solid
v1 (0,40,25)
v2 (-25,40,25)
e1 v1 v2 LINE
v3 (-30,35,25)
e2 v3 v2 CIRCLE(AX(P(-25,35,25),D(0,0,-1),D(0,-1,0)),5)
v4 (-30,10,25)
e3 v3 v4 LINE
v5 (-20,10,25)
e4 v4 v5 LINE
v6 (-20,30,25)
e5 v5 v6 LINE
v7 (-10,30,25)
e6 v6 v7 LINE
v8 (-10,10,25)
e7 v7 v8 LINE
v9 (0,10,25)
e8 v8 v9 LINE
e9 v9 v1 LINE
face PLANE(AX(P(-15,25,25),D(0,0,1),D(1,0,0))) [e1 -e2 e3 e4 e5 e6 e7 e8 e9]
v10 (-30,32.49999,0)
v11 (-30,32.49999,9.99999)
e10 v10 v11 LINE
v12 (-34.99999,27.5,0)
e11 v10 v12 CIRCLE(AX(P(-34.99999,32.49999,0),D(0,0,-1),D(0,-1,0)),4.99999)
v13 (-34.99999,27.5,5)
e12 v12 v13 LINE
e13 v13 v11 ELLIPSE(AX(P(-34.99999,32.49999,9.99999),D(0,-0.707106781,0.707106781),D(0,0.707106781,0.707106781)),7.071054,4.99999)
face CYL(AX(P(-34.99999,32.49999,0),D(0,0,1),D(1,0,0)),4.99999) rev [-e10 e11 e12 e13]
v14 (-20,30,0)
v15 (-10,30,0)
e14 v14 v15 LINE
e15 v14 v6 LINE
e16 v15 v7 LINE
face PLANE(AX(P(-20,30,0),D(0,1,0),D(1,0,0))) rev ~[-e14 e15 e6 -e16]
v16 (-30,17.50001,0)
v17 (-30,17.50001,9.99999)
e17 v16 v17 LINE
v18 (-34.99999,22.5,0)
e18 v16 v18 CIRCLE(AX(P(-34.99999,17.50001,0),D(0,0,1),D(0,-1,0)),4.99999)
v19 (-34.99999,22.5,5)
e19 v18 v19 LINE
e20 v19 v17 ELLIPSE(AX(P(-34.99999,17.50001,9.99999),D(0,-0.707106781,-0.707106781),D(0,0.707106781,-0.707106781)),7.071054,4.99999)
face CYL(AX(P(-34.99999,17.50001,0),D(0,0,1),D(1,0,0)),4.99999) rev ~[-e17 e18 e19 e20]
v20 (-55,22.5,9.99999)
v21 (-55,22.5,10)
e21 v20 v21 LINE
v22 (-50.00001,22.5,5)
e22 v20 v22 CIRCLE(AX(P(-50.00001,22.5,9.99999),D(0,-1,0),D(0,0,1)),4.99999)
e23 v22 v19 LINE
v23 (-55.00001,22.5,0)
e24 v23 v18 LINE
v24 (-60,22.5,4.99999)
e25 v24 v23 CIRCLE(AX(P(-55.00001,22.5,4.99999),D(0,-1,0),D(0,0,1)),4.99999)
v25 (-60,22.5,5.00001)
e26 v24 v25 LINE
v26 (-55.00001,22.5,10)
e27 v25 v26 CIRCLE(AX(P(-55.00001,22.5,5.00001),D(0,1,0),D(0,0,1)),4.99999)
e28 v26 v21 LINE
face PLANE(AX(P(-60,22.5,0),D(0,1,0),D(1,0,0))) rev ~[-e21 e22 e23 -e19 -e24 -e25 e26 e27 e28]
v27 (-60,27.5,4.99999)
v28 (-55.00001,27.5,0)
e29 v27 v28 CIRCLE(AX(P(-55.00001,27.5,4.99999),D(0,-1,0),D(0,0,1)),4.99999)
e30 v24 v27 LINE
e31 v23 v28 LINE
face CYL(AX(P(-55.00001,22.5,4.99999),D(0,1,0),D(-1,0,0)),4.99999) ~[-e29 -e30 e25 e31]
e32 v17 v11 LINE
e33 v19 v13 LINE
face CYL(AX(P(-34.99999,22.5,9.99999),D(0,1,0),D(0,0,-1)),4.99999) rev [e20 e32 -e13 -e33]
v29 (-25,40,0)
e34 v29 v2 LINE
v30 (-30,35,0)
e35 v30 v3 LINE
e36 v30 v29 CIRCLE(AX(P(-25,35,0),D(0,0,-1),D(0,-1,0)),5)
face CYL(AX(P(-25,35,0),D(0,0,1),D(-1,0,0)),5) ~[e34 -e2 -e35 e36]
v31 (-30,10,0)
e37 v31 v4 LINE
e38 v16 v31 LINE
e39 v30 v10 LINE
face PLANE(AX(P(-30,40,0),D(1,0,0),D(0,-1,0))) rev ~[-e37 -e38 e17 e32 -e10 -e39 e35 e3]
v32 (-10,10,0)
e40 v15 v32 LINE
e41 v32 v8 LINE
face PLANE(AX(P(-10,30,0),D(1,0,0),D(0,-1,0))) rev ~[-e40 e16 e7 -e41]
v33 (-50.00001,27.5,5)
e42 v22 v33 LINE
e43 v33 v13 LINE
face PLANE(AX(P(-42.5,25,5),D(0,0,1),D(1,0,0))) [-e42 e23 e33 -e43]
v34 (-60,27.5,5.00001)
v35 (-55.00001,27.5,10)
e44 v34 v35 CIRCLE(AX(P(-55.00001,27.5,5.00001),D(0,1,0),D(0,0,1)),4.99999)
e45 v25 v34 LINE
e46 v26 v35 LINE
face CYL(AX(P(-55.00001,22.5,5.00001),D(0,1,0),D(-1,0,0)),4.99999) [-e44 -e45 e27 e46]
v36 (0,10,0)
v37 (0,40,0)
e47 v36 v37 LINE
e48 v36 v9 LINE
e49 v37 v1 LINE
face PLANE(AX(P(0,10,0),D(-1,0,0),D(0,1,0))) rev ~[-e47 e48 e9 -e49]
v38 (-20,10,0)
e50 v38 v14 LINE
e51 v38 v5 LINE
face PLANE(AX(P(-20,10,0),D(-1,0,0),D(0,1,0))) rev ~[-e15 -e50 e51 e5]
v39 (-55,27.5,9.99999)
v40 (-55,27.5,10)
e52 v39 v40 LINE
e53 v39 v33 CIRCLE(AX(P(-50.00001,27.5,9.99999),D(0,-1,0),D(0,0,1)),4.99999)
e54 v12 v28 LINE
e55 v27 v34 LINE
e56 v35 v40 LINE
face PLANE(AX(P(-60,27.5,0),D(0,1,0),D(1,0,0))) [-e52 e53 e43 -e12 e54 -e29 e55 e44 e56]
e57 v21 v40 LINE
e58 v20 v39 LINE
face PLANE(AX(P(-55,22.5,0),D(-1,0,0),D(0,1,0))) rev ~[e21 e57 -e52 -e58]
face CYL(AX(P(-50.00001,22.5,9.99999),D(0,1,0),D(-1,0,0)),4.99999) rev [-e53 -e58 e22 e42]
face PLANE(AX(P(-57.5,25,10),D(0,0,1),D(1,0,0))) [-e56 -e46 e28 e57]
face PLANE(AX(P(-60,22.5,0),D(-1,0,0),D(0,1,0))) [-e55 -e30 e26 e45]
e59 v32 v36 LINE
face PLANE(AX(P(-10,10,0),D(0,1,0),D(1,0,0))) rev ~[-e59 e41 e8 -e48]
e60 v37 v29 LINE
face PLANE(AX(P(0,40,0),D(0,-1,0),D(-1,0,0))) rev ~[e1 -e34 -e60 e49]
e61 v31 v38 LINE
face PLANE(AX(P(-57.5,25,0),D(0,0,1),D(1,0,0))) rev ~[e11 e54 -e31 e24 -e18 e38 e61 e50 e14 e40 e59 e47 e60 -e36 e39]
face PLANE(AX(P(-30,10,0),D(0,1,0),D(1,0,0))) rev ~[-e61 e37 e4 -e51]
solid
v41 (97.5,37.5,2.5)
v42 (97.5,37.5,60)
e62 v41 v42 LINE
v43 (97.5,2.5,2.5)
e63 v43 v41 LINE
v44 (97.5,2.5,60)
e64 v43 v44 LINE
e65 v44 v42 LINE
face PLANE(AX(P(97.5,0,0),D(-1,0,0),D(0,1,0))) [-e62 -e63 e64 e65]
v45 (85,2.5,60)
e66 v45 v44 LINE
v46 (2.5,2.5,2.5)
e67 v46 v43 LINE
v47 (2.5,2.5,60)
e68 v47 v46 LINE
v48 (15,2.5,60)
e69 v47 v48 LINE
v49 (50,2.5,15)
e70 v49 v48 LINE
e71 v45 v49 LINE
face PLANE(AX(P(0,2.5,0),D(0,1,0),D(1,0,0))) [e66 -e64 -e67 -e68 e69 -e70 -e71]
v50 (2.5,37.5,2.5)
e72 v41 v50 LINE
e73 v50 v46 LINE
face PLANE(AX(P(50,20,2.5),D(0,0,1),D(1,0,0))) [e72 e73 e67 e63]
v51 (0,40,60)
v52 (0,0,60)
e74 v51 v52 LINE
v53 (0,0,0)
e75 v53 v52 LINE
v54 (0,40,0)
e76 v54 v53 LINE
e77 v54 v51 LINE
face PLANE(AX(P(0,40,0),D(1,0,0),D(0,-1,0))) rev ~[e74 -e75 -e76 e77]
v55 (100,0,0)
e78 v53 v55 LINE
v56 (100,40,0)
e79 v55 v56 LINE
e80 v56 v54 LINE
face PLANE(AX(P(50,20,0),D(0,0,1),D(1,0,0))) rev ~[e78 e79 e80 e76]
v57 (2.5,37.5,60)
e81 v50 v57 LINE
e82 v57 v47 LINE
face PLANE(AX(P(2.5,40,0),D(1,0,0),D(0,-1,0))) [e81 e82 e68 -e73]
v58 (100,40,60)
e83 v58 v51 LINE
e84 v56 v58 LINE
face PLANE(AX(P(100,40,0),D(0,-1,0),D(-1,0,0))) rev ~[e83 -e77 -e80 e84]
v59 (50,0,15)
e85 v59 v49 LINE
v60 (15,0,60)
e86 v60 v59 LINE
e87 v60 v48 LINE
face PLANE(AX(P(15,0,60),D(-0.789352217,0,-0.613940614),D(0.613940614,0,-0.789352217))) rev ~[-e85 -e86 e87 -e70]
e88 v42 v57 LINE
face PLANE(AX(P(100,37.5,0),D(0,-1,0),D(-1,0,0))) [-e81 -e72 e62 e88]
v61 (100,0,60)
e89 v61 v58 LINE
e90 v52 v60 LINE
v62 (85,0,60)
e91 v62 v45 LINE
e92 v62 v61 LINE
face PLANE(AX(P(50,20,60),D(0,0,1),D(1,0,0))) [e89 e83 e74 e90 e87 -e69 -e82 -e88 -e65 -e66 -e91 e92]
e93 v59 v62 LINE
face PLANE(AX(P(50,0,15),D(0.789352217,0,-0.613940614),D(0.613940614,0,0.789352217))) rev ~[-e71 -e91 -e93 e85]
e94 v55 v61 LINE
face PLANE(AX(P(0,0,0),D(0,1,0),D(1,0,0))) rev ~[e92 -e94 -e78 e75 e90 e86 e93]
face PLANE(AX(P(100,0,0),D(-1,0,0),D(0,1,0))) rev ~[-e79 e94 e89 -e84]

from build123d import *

# Parameters (mm, degrees)
F1_DEPTH  = 60
F2_T      = -2.5
F3_DEPTH  = 25
F4_W      = 25
F4_H      = 5
F5_DEPTH  = 5
F4_W_2    = 5
F6_DEPTH  = 10
F7_R      = 4.99999
F8_R      = 5
F10_DEPTH = 25


# Not quite as in the source:
# - a fillet or chamfer is up to 0.001 mm smaller than in the source, because OpenCascade refuses the exact size


with BuildPart() as f1:
    # F0 (on Top) → F1 (new body)
    with BuildSketch(Plane.XY):
        Polygon((0, 10), (0, 0), (100, 0), (100, 40), (0, 40), align=None)
    extrude(amount=F1_DEPTH)

    # F2
    f2_openings = [f1.faces().sort_by_distance(p)[0] for p in [
        (50, 20, 60),
    ]]
    offset(amount=F2_T, openings=f2_openings)

    # F9 (on face) → F10 (cut)
    with BuildSketch(Plane.XZ):
        Polygon((85, 60), (15, 60), (50, 15), align=None)
    extrude(amount=-F10_DEPTH, mode=Mode.SUBTRACT)


with BuildPart() as f3:
    # F0 (on Top) → F3 (new body)
    with BuildSketch(Plane.XY):
        Polygon((-10, 10), (0, 10), (0, 40), (-30, 40), (-30, 10), (-20, 10), (-20, 30), (-10, 30), align=None)
    extrude(amount=F3_DEPTH)

    # F4 (on Top) → F5 (join)
    with BuildSketch(Plane.XY):
        with Locations((-42.5, 25)):
            Rectangle(F4_W, F4_H)
    extrude(amount=F5_DEPTH)

    # F4 (on Top) → F6 (join)
    with BuildSketch(Plane.XY):
        with Locations((-57.5, 25)):
            Rectangle(F4_W_2, F4_H)
    extrude(amount=F6_DEPTH)

    # F7 (radius 5 in the source; OpenCascade refuses exactly that, so slightly less here)
    f7_edges = [f3.edges().sort_by_distance(p)[0] for p in [
        (-30, 25, 5),
        (-30, 22.5, 2.5),
        (-30, 27.5, 2.5),
        (-55, 25, 5),
        (-60, 25, 0),
        (-60, 25, 10),
    ]]
    fillet(f7_edges, radius=F7_R)

    # F8
    f8_edges = [f3.edges().sort_by_distance(p)[0] for p in [
        (-30, 40, 12.5),
    ]]
    fillet(f8_edges, radius=F8_R)


solid = Compound([f1.part, f3.part])
